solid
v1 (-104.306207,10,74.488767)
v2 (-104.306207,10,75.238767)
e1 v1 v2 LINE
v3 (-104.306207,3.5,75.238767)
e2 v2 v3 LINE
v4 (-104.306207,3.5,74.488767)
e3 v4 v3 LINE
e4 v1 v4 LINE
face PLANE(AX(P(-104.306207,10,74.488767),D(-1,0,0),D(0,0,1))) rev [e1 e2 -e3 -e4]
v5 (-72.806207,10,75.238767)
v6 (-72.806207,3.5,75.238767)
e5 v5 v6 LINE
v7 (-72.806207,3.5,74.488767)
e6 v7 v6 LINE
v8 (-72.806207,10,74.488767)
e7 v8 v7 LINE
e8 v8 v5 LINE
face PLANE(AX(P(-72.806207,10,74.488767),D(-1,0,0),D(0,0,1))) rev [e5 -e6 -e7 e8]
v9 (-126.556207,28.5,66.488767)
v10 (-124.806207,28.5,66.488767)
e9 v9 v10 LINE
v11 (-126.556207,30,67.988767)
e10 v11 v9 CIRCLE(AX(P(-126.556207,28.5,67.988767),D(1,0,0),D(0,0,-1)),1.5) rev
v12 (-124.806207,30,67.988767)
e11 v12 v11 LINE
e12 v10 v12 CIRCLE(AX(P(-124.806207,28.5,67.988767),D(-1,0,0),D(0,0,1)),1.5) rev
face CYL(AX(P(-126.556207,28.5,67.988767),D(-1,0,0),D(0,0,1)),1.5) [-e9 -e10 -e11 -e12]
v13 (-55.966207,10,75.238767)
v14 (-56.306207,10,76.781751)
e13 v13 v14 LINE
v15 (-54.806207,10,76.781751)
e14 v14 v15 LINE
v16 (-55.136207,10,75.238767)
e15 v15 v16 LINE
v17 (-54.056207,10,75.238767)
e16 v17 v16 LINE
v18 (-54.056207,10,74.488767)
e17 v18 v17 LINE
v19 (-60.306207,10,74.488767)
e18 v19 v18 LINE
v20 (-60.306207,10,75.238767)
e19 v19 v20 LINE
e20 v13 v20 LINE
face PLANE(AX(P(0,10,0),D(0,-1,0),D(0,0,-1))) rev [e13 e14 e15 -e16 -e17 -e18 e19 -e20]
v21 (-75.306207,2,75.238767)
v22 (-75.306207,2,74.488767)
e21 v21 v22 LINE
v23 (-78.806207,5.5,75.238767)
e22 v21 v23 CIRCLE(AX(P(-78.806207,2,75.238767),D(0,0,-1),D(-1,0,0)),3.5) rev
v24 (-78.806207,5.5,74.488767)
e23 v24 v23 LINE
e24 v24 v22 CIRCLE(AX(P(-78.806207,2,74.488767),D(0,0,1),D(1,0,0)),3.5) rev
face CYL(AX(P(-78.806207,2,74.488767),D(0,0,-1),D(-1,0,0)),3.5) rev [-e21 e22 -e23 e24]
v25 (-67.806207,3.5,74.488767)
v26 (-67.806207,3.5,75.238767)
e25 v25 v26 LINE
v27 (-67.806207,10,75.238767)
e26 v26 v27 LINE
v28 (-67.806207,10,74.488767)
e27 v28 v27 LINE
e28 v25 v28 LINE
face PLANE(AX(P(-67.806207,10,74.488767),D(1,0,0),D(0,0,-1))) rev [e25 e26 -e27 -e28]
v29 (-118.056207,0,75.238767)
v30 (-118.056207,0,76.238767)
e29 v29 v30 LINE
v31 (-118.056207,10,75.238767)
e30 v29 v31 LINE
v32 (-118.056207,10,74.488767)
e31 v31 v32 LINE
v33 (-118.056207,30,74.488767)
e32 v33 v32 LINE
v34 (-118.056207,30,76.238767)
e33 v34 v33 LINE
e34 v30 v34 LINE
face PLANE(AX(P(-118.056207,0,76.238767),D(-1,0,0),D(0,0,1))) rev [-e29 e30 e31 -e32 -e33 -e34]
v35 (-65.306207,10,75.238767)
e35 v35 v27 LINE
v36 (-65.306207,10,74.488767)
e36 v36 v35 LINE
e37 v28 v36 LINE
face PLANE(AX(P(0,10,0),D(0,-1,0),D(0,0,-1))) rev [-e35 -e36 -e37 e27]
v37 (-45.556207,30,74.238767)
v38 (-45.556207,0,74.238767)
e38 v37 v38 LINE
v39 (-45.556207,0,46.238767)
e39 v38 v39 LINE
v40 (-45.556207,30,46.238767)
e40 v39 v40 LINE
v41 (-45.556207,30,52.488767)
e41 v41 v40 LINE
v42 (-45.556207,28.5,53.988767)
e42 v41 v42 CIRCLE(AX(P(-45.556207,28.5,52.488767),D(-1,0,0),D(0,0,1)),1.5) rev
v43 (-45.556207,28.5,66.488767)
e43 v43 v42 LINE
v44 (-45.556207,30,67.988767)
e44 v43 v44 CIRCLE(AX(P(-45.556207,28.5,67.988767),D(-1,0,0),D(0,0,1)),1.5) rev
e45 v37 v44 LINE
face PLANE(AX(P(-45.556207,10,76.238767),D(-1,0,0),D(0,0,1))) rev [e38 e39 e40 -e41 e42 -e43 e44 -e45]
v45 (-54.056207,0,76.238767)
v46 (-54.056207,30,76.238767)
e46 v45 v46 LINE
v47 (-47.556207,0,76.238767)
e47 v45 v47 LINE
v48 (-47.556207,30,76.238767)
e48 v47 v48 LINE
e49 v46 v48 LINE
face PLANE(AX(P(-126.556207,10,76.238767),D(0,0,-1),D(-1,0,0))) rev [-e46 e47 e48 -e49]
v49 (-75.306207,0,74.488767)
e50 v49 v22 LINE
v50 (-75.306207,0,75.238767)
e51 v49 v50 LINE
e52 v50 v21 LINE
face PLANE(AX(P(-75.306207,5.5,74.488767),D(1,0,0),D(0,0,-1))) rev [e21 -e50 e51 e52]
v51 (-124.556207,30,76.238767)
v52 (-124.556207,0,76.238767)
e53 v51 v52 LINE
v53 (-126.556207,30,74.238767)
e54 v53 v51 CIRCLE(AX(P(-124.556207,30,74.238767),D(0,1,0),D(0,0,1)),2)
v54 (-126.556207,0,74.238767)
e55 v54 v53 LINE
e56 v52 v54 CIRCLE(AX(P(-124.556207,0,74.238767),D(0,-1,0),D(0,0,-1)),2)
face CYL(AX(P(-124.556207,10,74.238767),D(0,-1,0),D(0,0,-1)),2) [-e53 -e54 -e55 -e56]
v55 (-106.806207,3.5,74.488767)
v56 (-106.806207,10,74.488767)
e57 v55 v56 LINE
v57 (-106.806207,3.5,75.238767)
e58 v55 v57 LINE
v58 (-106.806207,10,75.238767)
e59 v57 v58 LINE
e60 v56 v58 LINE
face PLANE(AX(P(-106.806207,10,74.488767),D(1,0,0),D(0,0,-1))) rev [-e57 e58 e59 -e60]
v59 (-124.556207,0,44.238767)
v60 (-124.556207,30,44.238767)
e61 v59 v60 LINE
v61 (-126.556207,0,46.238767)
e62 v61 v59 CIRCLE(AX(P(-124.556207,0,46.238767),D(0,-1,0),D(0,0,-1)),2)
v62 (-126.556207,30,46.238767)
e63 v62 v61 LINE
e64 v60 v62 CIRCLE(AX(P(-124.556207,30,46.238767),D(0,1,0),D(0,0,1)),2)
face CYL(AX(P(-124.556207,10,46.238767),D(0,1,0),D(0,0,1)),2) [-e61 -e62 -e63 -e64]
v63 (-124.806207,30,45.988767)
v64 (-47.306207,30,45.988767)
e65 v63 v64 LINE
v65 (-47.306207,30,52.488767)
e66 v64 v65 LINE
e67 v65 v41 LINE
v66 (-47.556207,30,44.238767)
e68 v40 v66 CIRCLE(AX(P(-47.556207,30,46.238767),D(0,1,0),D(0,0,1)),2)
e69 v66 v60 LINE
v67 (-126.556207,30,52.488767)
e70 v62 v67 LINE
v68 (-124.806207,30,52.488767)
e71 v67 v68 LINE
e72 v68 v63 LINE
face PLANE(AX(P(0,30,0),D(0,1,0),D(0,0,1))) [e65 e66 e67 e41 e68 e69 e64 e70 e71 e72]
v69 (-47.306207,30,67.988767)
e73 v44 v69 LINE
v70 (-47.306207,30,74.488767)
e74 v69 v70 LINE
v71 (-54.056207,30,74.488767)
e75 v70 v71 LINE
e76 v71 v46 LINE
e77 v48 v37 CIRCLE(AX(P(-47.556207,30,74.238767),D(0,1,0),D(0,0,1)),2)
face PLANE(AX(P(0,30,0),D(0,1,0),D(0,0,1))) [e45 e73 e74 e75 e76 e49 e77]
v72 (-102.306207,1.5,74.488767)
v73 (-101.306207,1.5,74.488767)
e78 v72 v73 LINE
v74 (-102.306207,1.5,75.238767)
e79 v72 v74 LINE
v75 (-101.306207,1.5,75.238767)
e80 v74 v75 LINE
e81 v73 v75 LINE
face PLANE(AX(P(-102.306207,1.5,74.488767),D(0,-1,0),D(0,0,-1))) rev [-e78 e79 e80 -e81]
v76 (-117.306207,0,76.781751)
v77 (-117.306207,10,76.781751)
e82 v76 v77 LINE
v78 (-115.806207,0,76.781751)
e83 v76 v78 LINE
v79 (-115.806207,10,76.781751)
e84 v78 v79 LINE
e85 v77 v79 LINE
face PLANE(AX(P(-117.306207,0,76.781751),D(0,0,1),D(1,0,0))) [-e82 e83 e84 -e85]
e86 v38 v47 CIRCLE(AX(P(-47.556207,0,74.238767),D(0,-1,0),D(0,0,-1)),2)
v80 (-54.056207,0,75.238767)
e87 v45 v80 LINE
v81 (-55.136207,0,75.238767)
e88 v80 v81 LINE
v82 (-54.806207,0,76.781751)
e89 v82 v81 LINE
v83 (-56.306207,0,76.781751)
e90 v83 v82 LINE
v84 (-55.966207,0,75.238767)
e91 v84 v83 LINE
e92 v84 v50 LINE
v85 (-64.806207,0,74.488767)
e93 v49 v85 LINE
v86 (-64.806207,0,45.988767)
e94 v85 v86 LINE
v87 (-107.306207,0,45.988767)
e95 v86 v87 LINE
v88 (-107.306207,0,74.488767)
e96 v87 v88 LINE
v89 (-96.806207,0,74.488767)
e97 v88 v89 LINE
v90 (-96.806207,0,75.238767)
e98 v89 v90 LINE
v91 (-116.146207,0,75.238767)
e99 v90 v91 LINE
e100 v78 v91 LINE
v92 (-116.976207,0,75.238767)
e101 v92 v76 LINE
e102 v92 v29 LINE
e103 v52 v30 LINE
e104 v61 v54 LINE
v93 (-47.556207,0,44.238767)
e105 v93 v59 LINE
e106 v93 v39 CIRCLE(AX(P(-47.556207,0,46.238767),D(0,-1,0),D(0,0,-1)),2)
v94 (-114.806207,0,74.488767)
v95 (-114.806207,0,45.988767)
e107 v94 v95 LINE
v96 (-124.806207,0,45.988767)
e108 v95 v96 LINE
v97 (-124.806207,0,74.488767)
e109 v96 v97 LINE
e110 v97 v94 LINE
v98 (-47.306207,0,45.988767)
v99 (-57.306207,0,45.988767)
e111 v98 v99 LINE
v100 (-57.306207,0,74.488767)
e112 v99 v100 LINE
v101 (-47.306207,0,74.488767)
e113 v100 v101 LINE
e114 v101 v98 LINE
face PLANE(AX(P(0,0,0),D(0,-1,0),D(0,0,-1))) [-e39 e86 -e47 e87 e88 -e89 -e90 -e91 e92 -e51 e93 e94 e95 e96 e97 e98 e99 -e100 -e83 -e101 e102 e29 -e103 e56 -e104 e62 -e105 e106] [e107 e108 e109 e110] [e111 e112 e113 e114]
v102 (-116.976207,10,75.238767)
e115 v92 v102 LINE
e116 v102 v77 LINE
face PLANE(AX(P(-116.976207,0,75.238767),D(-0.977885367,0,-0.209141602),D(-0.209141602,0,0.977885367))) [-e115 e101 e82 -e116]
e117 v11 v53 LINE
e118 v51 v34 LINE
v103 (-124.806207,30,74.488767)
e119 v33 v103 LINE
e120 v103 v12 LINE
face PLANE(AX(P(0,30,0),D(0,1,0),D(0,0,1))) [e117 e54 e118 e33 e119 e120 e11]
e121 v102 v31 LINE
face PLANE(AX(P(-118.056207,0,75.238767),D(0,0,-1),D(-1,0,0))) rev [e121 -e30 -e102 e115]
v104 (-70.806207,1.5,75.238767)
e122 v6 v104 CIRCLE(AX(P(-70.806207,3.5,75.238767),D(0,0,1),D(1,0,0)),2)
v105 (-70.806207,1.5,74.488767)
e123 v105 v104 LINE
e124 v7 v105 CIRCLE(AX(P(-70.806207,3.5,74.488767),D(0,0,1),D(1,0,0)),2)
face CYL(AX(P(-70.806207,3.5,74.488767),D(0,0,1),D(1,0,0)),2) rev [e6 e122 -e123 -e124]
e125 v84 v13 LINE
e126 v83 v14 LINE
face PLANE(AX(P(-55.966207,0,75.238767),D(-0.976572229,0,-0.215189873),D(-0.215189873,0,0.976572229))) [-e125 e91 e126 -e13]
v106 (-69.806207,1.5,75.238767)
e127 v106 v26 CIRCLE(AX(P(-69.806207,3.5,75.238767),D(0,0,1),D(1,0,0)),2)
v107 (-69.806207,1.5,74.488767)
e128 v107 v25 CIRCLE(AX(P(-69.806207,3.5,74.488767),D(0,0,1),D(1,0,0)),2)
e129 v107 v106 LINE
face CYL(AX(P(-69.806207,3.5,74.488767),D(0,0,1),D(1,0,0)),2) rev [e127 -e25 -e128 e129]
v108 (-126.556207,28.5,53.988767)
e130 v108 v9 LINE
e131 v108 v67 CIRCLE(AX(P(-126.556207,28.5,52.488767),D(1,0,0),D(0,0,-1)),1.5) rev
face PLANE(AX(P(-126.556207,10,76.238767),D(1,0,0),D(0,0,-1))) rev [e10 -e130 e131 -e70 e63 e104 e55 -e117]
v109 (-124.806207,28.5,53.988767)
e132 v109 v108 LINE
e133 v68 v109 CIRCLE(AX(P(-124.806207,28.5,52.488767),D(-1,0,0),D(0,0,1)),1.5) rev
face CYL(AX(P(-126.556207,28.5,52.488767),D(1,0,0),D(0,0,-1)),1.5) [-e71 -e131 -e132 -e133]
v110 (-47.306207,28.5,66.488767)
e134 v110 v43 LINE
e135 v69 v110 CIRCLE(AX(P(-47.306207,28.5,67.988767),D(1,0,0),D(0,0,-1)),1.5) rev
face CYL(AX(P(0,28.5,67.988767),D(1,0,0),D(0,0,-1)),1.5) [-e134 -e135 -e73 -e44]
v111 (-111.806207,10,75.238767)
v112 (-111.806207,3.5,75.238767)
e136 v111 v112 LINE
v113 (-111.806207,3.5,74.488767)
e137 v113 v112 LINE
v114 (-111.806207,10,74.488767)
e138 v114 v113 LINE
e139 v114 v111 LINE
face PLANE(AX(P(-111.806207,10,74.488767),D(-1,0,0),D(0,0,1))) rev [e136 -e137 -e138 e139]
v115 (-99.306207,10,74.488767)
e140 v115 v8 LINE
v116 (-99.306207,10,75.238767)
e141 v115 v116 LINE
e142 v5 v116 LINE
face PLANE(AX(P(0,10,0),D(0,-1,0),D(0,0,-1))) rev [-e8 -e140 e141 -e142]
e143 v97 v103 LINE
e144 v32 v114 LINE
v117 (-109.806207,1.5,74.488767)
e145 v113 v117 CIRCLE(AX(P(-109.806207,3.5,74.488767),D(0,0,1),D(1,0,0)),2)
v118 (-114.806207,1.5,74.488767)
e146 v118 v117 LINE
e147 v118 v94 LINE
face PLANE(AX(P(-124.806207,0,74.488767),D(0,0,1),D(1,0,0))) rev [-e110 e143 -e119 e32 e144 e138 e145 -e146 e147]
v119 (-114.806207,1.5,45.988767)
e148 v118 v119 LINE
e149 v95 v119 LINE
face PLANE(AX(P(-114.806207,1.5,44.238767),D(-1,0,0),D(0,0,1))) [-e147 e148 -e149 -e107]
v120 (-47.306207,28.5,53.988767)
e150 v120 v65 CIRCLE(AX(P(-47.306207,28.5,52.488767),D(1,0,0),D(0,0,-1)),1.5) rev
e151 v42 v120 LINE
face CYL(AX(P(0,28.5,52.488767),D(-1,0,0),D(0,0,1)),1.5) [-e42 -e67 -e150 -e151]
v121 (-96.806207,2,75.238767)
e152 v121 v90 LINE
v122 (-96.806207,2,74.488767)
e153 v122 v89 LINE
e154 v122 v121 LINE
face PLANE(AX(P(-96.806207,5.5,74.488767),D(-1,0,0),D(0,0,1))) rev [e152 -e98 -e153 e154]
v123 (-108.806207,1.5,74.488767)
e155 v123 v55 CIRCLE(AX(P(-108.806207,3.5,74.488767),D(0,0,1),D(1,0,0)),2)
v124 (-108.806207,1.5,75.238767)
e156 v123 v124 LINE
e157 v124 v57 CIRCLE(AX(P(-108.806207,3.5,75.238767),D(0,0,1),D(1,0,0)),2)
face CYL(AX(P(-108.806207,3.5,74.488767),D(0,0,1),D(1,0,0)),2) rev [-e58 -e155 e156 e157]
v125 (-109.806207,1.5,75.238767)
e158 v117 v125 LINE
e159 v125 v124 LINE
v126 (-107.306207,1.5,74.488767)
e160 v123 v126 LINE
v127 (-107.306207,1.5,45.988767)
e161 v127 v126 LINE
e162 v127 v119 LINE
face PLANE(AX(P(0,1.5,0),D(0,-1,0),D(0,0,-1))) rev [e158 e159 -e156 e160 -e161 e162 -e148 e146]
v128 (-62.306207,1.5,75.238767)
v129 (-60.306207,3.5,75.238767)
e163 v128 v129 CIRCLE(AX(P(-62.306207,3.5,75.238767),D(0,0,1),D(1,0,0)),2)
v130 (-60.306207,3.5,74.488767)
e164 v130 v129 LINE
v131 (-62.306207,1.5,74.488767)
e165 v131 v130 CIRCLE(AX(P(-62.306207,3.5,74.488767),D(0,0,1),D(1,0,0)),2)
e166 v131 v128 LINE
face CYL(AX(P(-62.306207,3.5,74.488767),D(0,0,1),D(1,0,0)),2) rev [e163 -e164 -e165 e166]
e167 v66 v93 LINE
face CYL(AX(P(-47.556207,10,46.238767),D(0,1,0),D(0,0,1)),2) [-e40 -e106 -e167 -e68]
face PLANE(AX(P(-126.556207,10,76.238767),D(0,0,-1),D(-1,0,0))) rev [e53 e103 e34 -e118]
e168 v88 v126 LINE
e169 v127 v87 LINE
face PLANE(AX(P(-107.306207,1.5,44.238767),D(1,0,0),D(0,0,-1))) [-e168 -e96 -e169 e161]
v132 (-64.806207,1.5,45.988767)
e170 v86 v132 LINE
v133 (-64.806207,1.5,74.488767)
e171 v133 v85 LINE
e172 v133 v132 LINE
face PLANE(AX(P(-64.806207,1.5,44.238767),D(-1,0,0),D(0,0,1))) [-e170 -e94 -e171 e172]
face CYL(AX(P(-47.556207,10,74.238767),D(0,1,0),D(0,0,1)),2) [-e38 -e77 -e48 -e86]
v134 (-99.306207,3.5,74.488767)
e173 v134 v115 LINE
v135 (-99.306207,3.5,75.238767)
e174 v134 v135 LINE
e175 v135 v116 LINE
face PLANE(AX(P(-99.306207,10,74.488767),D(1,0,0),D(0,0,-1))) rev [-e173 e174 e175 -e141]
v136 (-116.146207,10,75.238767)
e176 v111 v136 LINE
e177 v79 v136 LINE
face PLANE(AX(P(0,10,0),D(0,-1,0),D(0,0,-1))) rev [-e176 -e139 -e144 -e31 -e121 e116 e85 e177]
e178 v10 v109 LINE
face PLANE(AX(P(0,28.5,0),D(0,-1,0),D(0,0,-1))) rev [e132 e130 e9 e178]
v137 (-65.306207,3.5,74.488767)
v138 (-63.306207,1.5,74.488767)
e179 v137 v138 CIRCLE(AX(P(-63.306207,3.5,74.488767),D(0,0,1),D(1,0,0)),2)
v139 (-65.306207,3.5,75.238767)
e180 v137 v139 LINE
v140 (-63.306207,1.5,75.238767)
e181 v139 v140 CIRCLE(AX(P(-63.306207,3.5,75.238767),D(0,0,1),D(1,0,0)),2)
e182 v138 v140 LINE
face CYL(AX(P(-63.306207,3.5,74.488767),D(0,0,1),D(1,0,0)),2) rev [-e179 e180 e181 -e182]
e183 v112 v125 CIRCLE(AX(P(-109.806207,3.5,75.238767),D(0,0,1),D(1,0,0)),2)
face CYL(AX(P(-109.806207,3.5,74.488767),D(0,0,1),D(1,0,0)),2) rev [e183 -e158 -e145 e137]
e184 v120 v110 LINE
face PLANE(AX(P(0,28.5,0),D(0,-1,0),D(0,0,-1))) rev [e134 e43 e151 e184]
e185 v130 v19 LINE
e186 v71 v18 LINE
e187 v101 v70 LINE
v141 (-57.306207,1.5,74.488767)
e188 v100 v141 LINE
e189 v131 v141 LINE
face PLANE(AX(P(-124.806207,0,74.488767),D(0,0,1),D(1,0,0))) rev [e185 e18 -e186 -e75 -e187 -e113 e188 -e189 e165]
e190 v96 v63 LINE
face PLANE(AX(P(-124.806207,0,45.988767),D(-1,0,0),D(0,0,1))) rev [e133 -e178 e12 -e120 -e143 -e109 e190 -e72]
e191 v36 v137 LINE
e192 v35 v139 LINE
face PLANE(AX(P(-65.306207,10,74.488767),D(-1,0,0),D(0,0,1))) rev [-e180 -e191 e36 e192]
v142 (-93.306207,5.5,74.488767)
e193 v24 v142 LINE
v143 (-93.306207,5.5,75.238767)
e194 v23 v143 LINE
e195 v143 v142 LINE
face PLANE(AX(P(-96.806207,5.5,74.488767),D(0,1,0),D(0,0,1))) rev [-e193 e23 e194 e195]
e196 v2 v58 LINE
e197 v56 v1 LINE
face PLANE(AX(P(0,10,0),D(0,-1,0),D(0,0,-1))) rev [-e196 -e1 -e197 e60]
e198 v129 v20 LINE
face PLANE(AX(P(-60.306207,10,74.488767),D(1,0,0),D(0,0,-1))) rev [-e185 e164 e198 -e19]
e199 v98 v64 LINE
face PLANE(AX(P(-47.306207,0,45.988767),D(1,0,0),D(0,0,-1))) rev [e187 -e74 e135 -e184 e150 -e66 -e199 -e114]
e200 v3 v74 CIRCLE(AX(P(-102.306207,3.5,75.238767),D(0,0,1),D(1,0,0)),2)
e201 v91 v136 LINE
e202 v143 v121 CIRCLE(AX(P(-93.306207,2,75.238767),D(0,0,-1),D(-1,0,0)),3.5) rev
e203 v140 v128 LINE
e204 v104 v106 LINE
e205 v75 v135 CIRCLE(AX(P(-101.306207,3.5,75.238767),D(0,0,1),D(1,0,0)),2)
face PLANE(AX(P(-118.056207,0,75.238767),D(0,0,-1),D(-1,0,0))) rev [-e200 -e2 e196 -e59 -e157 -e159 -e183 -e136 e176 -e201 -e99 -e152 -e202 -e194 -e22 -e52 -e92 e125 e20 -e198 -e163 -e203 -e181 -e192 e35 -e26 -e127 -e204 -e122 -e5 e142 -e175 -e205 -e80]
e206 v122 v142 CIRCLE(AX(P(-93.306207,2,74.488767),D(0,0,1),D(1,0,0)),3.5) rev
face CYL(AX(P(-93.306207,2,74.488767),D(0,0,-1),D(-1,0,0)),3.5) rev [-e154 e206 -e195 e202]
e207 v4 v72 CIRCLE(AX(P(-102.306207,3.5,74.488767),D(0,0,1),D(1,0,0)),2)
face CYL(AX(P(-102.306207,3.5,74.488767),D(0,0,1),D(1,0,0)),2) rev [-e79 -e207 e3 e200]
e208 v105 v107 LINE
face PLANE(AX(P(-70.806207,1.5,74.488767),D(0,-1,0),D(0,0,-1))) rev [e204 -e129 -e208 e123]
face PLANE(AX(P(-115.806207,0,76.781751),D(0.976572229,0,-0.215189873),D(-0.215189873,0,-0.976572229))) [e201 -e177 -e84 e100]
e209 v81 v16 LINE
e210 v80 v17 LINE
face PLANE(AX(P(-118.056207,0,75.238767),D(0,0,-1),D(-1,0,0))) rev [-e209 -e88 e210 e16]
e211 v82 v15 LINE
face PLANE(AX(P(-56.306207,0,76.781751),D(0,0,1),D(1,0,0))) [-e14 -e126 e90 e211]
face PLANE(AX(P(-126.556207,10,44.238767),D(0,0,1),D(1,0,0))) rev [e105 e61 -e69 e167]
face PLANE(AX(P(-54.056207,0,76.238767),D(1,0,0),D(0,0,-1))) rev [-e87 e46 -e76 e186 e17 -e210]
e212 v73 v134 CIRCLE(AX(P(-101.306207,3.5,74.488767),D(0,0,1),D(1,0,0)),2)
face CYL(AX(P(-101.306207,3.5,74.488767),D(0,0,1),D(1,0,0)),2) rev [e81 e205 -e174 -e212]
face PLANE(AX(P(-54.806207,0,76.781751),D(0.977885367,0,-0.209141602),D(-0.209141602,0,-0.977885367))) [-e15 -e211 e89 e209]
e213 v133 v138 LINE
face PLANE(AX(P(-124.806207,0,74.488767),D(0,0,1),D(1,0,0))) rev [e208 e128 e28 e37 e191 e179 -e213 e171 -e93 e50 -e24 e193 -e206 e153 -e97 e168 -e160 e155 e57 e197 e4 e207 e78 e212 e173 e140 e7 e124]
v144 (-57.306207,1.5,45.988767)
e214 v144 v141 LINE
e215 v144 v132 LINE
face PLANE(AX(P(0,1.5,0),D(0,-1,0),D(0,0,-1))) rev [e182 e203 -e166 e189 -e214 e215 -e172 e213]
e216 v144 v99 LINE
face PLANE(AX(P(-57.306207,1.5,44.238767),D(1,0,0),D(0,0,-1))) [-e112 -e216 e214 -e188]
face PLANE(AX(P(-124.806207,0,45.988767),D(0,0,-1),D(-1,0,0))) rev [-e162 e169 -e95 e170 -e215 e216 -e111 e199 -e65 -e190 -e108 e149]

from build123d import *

# Parameters (mm, degrees)
SKETCH1_W           = 81
SKETCH1_H           = 32
BOSS_EXTRUDE1_DEPTH = 10
SKETCH2_W           = 77.5
SKETCH2_H           = 28.5
CUT_EXTRUDE1_DEPTH  = 10
SKETCH3_W           = 7.5
SKETCH3_H           = 32
BOSS_EXTRUDE2_DEPTH = 1.5
SKETCH4_W           = 64
SKETCH4_H           = 1
CUT_EXTRUDE2_DEPTH  = 10
BOSS_EXTRUDE3_DEPTH = 10
BOSS_EXTRUDE4_DEPTH = 10
FILLET1_R           = 2
FILLET2_R           = 2
FILLET3_R           = 2
FILLET4_R           = 2
CUT_EXTRUDE3_DEPTH  = 0.75
SKETCH8_W           = 21.5
SKETCH8_H           = 5.5
CUT_EXTRUDE4_DEPTH  = 0.75
FILLET5_R           = 3.5
FILLET6_R           = 3.5
BOSS_EXTRUDE5_START = 20
BOSS_EXTRUDE5_DEPTH = 20
SKETCH10_W          = 1.75
SKETCH10_H          = 12.5
CUT_EXTRUDE5_DEPTH  = 1.5
FILLET7_R           = 1.5
FILLET8_R           = 1.5
FILLET10_R          = 1.5
FILLET11_R          = 1.5


with BuildPart() as part:
    # Sketch1 → Boss-Extrude1 (new body)
    with BuildSketch(Plane(origin=(0, 0, 0), x_dir=(1, 0, 0), z_dir=(0, 1, 0))):
        with Locations((-86.056207425, -60.23876691)):
            Rectangle(SKETCH1_W, SKETCH1_H)
    extrude(amount=BOSS_EXTRUDE1_DEPTH)

    # Sketch2 → Cut-Extrude1 (cut)
    with BuildSketch(Plane(origin=(0, 10, 0), x_dir=(1, 0, 0), z_dir=(0, 1, 0))):
        with Locations((-86.056207425, -60.23876691)):
            Rectangle(SKETCH2_W, SKETCH2_H)
    extrude(amount=-CUT_EXTRUDE1_DEPTH, mode=Mode.SUBTRACT)

    # Sketch3 → Boss-Extrude2 (add)
    with BuildSketch(Plane(origin=(0, 0, 0), x_dir=(-1, 0, 0), z_dir=(0, -1, 0))):
        with Locations((61.056207425, -60.23876691)):
            Rectangle(SKETCH3_W, SKETCH3_H)
        with Locations((111.056207425, -60.23876691)):
            Rectangle(SKETCH3_W, SKETCH3_H)
    extrude(amount=-BOSS_EXTRUDE2_DEPTH)

    # Sketch4 → Cut-Extrude2 (cut)
    with BuildSketch(Plane(origin=(0, 10, 0), x_dir=(1, 0, 0), z_dir=(0, 1, 0))):
        with Locations((-86.056207425, -75.73876691)):
            Rectangle(SKETCH4_W, SKETCH4_H)
    extrude(amount=-CUT_EXTRUDE2_DEPTH, mode=Mode.SUBTRACT)

    # Sketch5 → Boss-Extrude3 (add)
    with BuildSketch(Plane(origin=(0, 10, 0), x_dir=(1, 0, 0), z_dir=(0, 1, 0))):
        Polygon((-116.976207425, -75.23876691), (-117.306207425, -76.781751031), (-115.806207425, -76.781751031), (-116.146207425, -75.23876691), align=None)
    extrude(amount=-BOSS_EXTRUDE3_DEPTH)

    # Sketch6 → Boss-Extrude4 (add)
    with BuildSketch(Plane(origin=(0, 10, 0), x_dir=(1, 0, 0), z_dir=(0, 1, 0))):
        Polygon((-55.966207425, -75.23876691), (-56.306207425, -76.781751031), (-54.806207425, -76.781751031), (-55.136207425, -75.23876691), align=None)
    extrude(amount=-BOSS_EXTRUDE4_DEPTH)

    # Fillet1
    fillet1_edges = [part.edges().sort_by_distance(p)[0] for p in [
        (-126.556207425, 5, 76.23876691),
    ]]
    fillet(fillet1_edges, radius=FILLET1_R)

    # Fillet2
    fillet2_edges = [part.edges().sort_by_distance(p)[0] for p in [
        (-45.556207425, 5, 76.23876691),
    ]]
    fillet(fillet2_edges, radius=FILLET2_R)

    # Fillet3
    fillet3_edges = [part.edges().sort_by_distance(p)[0] for p in [
        (-45.556207425, 5, 44.23876691),
    ]]
    fillet(fillet3_edges, radius=FILLET3_R)

    # Fillet4
    fillet4_edges = [part.edges().sort_by_distance(p)[0] for p in [
        (-126.556207425, 5, 44.23876691),
    ]]
    fillet(fillet4_edges, radius=FILLET4_R)

    # Sketch7 → Cut-Extrude3 (cut)
    with BuildSketch(Plane.XY.offset(75.23876691)):
        with BuildLine():
            Line((-111.806207425, 10), (-106.806207425, 10))
            Line((-106.806207425, 10), (-106.806207425, 3.5))
            ThreePointArc((-106.806207425, 3.5), (-107.391993862, 2.085786438), (-108.806207425, 1.5))
            Line((-108.806207425, 1.5), (-109.806207425, 1.5))
            ThreePointArc((-109.806207425, 1.5), (-111.220420987, 2.085786438), (-111.806207425, 3.5))
            Line((-111.806207425, 3.5), (-111.806207425, 10))
        make_face()
        with BuildLine():
            Line((-65.306207425, 10), (-60.306207425, 10))
            Line((-60.306207425, 10), (-60.306207425, 3.5))
            ThreePointArc((-60.306207425, 3.5), (-60.891993862, 2.085786438), (-62.306207425, 1.5))
            Line((-62.306207425, 1.5), (-63.306207425, 1.5))
            ThreePointArc((-63.306207425, 1.5), (-64.720420987, 2.085786438), (-65.306207425, 3.5))
            Line((-65.306207425, 3.5), (-65.306207425, 10))
        make_face()
        with BuildLine():
            Line((-104.306207425, 10), (-99.306207425, 10))
            Line((-99.306207425, 10), (-99.306207425, 3.5))
            ThreePointArc((-99.306207425, 3.5), (-99.891993862, 2.085786438), (-101.306207425, 1.5))
            Line((-101.306207425, 1.5), (-102.306207425, 1.5))
            ThreePointArc((-102.306207425, 1.5), (-103.720420987, 2.085786438), (-104.306207425, 3.5))
            Line((-104.306207425, 3.5), (-104.306207425, 10))
        make_face()
        with BuildLine():
            Line((-72.806207425, 10), (-67.806207425, 10))
            Line((-67.806207425, 10), (-67.806207425, 3.5))
            ThreePointArc((-67.806207425, 3.5), (-68.391993862, 2.085786438), (-69.806207425, 1.5))
            Line((-69.806207425, 1.5), (-70.806207425, 1.5))
            ThreePointArc((-70.806207425, 1.5), (-72.220420987, 2.085786438), (-72.806207425, 3.5))
            Line((-72.806207425, 3.5), (-72.806207425, 10))
        make_face()
    extrude(amount=-CUT_EXTRUDE3_DEPTH, mode=Mode.SUBTRACT)

    # Sketch8 → Cut-Extrude4 (cut)
    with BuildSketch(Plane.XY.offset(75.23876691)):
        with Locations((-86.056207425, 2.75)):
            Rectangle(SKETCH8_W, SKETCH8_H)
    extrude(amount=-CUT_EXTRUDE4_DEPTH, mode=Mode.SUBTRACT)

    # Fillet5
    fillet5_edges = [part.edges().sort_by_distance(p)[0] for p in [
        (-96.806207425, 5.5, 74.86376691),
    ]]
    fillet(fillet5_edges, radius=FILLET5_R)

    # Fillet6
    fillet6_edges = [part.edges().sort_by_distance(p)[0] for p in [
        (-75.306207425, 5.5, 74.86376691),
    ]]
    fillet(fillet6_edges, radius=FILLET6_R)

    # Sketch9 → Boss-Extrude5 (add)
    with BuildSketch(Plane(origin=(0, 10, 0), x_dir=(1, 0, 0), z_dir=(0, 1, 0)).offset(BOSS_EXTRUDE5_START)):
        with BuildLine():
            Line((-47.556207425, -44.23876691), (-124.556207425, -44.23876691))
            ThreePointArc((-124.556207425, -44.23876691), (-125.970420987, -44.824553347), (-126.556207425, -46.23876691))
            Line((-126.556207425, -46.23876691), (-126.556207425, -74.23876691))
            ThreePointArc((-126.556207425, -74.23876691), (-125.970420987, -75.652980472), (-124.556207425, -76.23876691))
            Line((-124.556207425, -76.23876691), (-118.056207425, -76.23876691))
            Line((-118.056207425, -76.23876691), (-118.056207425, -75.23876691))
            Line((-118.056207425, -75.23876691), (-118.056207425, -74.48876691))
            Line((-118.056207425, -74.48876691), (-124.806207425, -74.48876691))
            Line((-124.806207425, -74.48876691), (-124.806207425, -45.98876691))
            Line((-124.806207425, -45.98876691), (-47.306207425, -45.98876691))
            Line((-47.306207425, -45.98876691), (-47.306207425, -74.48876691))
            Line((-47.306207425, -74.48876691), (-54.056207425, -74.48876691))
            Line((-54.056207425, -74.48876691), (-54.056207425, -75.23876691))
            Line((-54.056207425, -75.23876691), (-54.056207425, -76.23876691))
            Line((-54.056207425, -76.23876691), (-47.556207425, -76.23876691))
            ThreePointArc((-47.556207425, -76.23876691), (-46.141993862, -75.652980472), (-45.556207425, -74.23876691))
            Line((-45.556207425, -74.23876691), (-45.556207425, -46.23876691))
            ThreePointArc((-45.556207425, -46.23876691), (-46.141993862, -44.824553347), (-47.556207425, -44.23876691))
        make_face()
    extrude(amount=-BOSS_EXTRUDE5_DEPTH)

    # Sketch10 → Cut-Extrude5 (cut)
    with BuildSketch(Plane(origin=(0, 30, 0), x_dir=(1, 0, 0), z_dir=(0, 1, 0))):
        with Locations((-46.431207425, -60.23876691)):
            Rectangle(SKETCH10_W, SKETCH10_H)
        with Locations((-125.681207425, -60.23876691)):
            Rectangle(SKETCH10_W, SKETCH10_H)
    extrude(amount=-CUT_EXTRUDE5_DEPTH, mode=Mode.SUBTRACT)

    # Fillet7
    fillet7_edges = [part.edges().sort_by_distance(p)[0] for p in [
        (-125.681207425, 30, 66.48876691),
    ]]
    fillet(fillet7_edges, radius=FILLET7_R - 0.0001)  # a hair under: the kernel refuses the full size

    # Fillet8
    fillet8_edges = [part.edges().sort_by_distance(p)[0] for p in [
        (-125.681207425, 30, 53.98876691),
    ]]
    fillet(fillet8_edges, radius=FILLET8_R - 0.0001)  # a hair under: the kernel refuses the full size

    # Fillet10
    fillet10_edges = [part.edges().sort_by_distance(p)[0] for p in [
        (-46.431207425, 30, 53.98876691),
    ]]
    fillet(fillet10_edges, radius=FILLET10_R - 0.0001)  # a hair under: the kernel refuses the full size

    # Fillet11
    fillet11_edges = [part.edges().sort_by_distance(p)[0] for p in [
        (-46.431207425, 30, 66.48876691),
    ]]
    fillet(fillet11_edges, radius=FILLET11_R - 0.0001)  # a hair under: the kernel refuses the full size


solid = part.part
